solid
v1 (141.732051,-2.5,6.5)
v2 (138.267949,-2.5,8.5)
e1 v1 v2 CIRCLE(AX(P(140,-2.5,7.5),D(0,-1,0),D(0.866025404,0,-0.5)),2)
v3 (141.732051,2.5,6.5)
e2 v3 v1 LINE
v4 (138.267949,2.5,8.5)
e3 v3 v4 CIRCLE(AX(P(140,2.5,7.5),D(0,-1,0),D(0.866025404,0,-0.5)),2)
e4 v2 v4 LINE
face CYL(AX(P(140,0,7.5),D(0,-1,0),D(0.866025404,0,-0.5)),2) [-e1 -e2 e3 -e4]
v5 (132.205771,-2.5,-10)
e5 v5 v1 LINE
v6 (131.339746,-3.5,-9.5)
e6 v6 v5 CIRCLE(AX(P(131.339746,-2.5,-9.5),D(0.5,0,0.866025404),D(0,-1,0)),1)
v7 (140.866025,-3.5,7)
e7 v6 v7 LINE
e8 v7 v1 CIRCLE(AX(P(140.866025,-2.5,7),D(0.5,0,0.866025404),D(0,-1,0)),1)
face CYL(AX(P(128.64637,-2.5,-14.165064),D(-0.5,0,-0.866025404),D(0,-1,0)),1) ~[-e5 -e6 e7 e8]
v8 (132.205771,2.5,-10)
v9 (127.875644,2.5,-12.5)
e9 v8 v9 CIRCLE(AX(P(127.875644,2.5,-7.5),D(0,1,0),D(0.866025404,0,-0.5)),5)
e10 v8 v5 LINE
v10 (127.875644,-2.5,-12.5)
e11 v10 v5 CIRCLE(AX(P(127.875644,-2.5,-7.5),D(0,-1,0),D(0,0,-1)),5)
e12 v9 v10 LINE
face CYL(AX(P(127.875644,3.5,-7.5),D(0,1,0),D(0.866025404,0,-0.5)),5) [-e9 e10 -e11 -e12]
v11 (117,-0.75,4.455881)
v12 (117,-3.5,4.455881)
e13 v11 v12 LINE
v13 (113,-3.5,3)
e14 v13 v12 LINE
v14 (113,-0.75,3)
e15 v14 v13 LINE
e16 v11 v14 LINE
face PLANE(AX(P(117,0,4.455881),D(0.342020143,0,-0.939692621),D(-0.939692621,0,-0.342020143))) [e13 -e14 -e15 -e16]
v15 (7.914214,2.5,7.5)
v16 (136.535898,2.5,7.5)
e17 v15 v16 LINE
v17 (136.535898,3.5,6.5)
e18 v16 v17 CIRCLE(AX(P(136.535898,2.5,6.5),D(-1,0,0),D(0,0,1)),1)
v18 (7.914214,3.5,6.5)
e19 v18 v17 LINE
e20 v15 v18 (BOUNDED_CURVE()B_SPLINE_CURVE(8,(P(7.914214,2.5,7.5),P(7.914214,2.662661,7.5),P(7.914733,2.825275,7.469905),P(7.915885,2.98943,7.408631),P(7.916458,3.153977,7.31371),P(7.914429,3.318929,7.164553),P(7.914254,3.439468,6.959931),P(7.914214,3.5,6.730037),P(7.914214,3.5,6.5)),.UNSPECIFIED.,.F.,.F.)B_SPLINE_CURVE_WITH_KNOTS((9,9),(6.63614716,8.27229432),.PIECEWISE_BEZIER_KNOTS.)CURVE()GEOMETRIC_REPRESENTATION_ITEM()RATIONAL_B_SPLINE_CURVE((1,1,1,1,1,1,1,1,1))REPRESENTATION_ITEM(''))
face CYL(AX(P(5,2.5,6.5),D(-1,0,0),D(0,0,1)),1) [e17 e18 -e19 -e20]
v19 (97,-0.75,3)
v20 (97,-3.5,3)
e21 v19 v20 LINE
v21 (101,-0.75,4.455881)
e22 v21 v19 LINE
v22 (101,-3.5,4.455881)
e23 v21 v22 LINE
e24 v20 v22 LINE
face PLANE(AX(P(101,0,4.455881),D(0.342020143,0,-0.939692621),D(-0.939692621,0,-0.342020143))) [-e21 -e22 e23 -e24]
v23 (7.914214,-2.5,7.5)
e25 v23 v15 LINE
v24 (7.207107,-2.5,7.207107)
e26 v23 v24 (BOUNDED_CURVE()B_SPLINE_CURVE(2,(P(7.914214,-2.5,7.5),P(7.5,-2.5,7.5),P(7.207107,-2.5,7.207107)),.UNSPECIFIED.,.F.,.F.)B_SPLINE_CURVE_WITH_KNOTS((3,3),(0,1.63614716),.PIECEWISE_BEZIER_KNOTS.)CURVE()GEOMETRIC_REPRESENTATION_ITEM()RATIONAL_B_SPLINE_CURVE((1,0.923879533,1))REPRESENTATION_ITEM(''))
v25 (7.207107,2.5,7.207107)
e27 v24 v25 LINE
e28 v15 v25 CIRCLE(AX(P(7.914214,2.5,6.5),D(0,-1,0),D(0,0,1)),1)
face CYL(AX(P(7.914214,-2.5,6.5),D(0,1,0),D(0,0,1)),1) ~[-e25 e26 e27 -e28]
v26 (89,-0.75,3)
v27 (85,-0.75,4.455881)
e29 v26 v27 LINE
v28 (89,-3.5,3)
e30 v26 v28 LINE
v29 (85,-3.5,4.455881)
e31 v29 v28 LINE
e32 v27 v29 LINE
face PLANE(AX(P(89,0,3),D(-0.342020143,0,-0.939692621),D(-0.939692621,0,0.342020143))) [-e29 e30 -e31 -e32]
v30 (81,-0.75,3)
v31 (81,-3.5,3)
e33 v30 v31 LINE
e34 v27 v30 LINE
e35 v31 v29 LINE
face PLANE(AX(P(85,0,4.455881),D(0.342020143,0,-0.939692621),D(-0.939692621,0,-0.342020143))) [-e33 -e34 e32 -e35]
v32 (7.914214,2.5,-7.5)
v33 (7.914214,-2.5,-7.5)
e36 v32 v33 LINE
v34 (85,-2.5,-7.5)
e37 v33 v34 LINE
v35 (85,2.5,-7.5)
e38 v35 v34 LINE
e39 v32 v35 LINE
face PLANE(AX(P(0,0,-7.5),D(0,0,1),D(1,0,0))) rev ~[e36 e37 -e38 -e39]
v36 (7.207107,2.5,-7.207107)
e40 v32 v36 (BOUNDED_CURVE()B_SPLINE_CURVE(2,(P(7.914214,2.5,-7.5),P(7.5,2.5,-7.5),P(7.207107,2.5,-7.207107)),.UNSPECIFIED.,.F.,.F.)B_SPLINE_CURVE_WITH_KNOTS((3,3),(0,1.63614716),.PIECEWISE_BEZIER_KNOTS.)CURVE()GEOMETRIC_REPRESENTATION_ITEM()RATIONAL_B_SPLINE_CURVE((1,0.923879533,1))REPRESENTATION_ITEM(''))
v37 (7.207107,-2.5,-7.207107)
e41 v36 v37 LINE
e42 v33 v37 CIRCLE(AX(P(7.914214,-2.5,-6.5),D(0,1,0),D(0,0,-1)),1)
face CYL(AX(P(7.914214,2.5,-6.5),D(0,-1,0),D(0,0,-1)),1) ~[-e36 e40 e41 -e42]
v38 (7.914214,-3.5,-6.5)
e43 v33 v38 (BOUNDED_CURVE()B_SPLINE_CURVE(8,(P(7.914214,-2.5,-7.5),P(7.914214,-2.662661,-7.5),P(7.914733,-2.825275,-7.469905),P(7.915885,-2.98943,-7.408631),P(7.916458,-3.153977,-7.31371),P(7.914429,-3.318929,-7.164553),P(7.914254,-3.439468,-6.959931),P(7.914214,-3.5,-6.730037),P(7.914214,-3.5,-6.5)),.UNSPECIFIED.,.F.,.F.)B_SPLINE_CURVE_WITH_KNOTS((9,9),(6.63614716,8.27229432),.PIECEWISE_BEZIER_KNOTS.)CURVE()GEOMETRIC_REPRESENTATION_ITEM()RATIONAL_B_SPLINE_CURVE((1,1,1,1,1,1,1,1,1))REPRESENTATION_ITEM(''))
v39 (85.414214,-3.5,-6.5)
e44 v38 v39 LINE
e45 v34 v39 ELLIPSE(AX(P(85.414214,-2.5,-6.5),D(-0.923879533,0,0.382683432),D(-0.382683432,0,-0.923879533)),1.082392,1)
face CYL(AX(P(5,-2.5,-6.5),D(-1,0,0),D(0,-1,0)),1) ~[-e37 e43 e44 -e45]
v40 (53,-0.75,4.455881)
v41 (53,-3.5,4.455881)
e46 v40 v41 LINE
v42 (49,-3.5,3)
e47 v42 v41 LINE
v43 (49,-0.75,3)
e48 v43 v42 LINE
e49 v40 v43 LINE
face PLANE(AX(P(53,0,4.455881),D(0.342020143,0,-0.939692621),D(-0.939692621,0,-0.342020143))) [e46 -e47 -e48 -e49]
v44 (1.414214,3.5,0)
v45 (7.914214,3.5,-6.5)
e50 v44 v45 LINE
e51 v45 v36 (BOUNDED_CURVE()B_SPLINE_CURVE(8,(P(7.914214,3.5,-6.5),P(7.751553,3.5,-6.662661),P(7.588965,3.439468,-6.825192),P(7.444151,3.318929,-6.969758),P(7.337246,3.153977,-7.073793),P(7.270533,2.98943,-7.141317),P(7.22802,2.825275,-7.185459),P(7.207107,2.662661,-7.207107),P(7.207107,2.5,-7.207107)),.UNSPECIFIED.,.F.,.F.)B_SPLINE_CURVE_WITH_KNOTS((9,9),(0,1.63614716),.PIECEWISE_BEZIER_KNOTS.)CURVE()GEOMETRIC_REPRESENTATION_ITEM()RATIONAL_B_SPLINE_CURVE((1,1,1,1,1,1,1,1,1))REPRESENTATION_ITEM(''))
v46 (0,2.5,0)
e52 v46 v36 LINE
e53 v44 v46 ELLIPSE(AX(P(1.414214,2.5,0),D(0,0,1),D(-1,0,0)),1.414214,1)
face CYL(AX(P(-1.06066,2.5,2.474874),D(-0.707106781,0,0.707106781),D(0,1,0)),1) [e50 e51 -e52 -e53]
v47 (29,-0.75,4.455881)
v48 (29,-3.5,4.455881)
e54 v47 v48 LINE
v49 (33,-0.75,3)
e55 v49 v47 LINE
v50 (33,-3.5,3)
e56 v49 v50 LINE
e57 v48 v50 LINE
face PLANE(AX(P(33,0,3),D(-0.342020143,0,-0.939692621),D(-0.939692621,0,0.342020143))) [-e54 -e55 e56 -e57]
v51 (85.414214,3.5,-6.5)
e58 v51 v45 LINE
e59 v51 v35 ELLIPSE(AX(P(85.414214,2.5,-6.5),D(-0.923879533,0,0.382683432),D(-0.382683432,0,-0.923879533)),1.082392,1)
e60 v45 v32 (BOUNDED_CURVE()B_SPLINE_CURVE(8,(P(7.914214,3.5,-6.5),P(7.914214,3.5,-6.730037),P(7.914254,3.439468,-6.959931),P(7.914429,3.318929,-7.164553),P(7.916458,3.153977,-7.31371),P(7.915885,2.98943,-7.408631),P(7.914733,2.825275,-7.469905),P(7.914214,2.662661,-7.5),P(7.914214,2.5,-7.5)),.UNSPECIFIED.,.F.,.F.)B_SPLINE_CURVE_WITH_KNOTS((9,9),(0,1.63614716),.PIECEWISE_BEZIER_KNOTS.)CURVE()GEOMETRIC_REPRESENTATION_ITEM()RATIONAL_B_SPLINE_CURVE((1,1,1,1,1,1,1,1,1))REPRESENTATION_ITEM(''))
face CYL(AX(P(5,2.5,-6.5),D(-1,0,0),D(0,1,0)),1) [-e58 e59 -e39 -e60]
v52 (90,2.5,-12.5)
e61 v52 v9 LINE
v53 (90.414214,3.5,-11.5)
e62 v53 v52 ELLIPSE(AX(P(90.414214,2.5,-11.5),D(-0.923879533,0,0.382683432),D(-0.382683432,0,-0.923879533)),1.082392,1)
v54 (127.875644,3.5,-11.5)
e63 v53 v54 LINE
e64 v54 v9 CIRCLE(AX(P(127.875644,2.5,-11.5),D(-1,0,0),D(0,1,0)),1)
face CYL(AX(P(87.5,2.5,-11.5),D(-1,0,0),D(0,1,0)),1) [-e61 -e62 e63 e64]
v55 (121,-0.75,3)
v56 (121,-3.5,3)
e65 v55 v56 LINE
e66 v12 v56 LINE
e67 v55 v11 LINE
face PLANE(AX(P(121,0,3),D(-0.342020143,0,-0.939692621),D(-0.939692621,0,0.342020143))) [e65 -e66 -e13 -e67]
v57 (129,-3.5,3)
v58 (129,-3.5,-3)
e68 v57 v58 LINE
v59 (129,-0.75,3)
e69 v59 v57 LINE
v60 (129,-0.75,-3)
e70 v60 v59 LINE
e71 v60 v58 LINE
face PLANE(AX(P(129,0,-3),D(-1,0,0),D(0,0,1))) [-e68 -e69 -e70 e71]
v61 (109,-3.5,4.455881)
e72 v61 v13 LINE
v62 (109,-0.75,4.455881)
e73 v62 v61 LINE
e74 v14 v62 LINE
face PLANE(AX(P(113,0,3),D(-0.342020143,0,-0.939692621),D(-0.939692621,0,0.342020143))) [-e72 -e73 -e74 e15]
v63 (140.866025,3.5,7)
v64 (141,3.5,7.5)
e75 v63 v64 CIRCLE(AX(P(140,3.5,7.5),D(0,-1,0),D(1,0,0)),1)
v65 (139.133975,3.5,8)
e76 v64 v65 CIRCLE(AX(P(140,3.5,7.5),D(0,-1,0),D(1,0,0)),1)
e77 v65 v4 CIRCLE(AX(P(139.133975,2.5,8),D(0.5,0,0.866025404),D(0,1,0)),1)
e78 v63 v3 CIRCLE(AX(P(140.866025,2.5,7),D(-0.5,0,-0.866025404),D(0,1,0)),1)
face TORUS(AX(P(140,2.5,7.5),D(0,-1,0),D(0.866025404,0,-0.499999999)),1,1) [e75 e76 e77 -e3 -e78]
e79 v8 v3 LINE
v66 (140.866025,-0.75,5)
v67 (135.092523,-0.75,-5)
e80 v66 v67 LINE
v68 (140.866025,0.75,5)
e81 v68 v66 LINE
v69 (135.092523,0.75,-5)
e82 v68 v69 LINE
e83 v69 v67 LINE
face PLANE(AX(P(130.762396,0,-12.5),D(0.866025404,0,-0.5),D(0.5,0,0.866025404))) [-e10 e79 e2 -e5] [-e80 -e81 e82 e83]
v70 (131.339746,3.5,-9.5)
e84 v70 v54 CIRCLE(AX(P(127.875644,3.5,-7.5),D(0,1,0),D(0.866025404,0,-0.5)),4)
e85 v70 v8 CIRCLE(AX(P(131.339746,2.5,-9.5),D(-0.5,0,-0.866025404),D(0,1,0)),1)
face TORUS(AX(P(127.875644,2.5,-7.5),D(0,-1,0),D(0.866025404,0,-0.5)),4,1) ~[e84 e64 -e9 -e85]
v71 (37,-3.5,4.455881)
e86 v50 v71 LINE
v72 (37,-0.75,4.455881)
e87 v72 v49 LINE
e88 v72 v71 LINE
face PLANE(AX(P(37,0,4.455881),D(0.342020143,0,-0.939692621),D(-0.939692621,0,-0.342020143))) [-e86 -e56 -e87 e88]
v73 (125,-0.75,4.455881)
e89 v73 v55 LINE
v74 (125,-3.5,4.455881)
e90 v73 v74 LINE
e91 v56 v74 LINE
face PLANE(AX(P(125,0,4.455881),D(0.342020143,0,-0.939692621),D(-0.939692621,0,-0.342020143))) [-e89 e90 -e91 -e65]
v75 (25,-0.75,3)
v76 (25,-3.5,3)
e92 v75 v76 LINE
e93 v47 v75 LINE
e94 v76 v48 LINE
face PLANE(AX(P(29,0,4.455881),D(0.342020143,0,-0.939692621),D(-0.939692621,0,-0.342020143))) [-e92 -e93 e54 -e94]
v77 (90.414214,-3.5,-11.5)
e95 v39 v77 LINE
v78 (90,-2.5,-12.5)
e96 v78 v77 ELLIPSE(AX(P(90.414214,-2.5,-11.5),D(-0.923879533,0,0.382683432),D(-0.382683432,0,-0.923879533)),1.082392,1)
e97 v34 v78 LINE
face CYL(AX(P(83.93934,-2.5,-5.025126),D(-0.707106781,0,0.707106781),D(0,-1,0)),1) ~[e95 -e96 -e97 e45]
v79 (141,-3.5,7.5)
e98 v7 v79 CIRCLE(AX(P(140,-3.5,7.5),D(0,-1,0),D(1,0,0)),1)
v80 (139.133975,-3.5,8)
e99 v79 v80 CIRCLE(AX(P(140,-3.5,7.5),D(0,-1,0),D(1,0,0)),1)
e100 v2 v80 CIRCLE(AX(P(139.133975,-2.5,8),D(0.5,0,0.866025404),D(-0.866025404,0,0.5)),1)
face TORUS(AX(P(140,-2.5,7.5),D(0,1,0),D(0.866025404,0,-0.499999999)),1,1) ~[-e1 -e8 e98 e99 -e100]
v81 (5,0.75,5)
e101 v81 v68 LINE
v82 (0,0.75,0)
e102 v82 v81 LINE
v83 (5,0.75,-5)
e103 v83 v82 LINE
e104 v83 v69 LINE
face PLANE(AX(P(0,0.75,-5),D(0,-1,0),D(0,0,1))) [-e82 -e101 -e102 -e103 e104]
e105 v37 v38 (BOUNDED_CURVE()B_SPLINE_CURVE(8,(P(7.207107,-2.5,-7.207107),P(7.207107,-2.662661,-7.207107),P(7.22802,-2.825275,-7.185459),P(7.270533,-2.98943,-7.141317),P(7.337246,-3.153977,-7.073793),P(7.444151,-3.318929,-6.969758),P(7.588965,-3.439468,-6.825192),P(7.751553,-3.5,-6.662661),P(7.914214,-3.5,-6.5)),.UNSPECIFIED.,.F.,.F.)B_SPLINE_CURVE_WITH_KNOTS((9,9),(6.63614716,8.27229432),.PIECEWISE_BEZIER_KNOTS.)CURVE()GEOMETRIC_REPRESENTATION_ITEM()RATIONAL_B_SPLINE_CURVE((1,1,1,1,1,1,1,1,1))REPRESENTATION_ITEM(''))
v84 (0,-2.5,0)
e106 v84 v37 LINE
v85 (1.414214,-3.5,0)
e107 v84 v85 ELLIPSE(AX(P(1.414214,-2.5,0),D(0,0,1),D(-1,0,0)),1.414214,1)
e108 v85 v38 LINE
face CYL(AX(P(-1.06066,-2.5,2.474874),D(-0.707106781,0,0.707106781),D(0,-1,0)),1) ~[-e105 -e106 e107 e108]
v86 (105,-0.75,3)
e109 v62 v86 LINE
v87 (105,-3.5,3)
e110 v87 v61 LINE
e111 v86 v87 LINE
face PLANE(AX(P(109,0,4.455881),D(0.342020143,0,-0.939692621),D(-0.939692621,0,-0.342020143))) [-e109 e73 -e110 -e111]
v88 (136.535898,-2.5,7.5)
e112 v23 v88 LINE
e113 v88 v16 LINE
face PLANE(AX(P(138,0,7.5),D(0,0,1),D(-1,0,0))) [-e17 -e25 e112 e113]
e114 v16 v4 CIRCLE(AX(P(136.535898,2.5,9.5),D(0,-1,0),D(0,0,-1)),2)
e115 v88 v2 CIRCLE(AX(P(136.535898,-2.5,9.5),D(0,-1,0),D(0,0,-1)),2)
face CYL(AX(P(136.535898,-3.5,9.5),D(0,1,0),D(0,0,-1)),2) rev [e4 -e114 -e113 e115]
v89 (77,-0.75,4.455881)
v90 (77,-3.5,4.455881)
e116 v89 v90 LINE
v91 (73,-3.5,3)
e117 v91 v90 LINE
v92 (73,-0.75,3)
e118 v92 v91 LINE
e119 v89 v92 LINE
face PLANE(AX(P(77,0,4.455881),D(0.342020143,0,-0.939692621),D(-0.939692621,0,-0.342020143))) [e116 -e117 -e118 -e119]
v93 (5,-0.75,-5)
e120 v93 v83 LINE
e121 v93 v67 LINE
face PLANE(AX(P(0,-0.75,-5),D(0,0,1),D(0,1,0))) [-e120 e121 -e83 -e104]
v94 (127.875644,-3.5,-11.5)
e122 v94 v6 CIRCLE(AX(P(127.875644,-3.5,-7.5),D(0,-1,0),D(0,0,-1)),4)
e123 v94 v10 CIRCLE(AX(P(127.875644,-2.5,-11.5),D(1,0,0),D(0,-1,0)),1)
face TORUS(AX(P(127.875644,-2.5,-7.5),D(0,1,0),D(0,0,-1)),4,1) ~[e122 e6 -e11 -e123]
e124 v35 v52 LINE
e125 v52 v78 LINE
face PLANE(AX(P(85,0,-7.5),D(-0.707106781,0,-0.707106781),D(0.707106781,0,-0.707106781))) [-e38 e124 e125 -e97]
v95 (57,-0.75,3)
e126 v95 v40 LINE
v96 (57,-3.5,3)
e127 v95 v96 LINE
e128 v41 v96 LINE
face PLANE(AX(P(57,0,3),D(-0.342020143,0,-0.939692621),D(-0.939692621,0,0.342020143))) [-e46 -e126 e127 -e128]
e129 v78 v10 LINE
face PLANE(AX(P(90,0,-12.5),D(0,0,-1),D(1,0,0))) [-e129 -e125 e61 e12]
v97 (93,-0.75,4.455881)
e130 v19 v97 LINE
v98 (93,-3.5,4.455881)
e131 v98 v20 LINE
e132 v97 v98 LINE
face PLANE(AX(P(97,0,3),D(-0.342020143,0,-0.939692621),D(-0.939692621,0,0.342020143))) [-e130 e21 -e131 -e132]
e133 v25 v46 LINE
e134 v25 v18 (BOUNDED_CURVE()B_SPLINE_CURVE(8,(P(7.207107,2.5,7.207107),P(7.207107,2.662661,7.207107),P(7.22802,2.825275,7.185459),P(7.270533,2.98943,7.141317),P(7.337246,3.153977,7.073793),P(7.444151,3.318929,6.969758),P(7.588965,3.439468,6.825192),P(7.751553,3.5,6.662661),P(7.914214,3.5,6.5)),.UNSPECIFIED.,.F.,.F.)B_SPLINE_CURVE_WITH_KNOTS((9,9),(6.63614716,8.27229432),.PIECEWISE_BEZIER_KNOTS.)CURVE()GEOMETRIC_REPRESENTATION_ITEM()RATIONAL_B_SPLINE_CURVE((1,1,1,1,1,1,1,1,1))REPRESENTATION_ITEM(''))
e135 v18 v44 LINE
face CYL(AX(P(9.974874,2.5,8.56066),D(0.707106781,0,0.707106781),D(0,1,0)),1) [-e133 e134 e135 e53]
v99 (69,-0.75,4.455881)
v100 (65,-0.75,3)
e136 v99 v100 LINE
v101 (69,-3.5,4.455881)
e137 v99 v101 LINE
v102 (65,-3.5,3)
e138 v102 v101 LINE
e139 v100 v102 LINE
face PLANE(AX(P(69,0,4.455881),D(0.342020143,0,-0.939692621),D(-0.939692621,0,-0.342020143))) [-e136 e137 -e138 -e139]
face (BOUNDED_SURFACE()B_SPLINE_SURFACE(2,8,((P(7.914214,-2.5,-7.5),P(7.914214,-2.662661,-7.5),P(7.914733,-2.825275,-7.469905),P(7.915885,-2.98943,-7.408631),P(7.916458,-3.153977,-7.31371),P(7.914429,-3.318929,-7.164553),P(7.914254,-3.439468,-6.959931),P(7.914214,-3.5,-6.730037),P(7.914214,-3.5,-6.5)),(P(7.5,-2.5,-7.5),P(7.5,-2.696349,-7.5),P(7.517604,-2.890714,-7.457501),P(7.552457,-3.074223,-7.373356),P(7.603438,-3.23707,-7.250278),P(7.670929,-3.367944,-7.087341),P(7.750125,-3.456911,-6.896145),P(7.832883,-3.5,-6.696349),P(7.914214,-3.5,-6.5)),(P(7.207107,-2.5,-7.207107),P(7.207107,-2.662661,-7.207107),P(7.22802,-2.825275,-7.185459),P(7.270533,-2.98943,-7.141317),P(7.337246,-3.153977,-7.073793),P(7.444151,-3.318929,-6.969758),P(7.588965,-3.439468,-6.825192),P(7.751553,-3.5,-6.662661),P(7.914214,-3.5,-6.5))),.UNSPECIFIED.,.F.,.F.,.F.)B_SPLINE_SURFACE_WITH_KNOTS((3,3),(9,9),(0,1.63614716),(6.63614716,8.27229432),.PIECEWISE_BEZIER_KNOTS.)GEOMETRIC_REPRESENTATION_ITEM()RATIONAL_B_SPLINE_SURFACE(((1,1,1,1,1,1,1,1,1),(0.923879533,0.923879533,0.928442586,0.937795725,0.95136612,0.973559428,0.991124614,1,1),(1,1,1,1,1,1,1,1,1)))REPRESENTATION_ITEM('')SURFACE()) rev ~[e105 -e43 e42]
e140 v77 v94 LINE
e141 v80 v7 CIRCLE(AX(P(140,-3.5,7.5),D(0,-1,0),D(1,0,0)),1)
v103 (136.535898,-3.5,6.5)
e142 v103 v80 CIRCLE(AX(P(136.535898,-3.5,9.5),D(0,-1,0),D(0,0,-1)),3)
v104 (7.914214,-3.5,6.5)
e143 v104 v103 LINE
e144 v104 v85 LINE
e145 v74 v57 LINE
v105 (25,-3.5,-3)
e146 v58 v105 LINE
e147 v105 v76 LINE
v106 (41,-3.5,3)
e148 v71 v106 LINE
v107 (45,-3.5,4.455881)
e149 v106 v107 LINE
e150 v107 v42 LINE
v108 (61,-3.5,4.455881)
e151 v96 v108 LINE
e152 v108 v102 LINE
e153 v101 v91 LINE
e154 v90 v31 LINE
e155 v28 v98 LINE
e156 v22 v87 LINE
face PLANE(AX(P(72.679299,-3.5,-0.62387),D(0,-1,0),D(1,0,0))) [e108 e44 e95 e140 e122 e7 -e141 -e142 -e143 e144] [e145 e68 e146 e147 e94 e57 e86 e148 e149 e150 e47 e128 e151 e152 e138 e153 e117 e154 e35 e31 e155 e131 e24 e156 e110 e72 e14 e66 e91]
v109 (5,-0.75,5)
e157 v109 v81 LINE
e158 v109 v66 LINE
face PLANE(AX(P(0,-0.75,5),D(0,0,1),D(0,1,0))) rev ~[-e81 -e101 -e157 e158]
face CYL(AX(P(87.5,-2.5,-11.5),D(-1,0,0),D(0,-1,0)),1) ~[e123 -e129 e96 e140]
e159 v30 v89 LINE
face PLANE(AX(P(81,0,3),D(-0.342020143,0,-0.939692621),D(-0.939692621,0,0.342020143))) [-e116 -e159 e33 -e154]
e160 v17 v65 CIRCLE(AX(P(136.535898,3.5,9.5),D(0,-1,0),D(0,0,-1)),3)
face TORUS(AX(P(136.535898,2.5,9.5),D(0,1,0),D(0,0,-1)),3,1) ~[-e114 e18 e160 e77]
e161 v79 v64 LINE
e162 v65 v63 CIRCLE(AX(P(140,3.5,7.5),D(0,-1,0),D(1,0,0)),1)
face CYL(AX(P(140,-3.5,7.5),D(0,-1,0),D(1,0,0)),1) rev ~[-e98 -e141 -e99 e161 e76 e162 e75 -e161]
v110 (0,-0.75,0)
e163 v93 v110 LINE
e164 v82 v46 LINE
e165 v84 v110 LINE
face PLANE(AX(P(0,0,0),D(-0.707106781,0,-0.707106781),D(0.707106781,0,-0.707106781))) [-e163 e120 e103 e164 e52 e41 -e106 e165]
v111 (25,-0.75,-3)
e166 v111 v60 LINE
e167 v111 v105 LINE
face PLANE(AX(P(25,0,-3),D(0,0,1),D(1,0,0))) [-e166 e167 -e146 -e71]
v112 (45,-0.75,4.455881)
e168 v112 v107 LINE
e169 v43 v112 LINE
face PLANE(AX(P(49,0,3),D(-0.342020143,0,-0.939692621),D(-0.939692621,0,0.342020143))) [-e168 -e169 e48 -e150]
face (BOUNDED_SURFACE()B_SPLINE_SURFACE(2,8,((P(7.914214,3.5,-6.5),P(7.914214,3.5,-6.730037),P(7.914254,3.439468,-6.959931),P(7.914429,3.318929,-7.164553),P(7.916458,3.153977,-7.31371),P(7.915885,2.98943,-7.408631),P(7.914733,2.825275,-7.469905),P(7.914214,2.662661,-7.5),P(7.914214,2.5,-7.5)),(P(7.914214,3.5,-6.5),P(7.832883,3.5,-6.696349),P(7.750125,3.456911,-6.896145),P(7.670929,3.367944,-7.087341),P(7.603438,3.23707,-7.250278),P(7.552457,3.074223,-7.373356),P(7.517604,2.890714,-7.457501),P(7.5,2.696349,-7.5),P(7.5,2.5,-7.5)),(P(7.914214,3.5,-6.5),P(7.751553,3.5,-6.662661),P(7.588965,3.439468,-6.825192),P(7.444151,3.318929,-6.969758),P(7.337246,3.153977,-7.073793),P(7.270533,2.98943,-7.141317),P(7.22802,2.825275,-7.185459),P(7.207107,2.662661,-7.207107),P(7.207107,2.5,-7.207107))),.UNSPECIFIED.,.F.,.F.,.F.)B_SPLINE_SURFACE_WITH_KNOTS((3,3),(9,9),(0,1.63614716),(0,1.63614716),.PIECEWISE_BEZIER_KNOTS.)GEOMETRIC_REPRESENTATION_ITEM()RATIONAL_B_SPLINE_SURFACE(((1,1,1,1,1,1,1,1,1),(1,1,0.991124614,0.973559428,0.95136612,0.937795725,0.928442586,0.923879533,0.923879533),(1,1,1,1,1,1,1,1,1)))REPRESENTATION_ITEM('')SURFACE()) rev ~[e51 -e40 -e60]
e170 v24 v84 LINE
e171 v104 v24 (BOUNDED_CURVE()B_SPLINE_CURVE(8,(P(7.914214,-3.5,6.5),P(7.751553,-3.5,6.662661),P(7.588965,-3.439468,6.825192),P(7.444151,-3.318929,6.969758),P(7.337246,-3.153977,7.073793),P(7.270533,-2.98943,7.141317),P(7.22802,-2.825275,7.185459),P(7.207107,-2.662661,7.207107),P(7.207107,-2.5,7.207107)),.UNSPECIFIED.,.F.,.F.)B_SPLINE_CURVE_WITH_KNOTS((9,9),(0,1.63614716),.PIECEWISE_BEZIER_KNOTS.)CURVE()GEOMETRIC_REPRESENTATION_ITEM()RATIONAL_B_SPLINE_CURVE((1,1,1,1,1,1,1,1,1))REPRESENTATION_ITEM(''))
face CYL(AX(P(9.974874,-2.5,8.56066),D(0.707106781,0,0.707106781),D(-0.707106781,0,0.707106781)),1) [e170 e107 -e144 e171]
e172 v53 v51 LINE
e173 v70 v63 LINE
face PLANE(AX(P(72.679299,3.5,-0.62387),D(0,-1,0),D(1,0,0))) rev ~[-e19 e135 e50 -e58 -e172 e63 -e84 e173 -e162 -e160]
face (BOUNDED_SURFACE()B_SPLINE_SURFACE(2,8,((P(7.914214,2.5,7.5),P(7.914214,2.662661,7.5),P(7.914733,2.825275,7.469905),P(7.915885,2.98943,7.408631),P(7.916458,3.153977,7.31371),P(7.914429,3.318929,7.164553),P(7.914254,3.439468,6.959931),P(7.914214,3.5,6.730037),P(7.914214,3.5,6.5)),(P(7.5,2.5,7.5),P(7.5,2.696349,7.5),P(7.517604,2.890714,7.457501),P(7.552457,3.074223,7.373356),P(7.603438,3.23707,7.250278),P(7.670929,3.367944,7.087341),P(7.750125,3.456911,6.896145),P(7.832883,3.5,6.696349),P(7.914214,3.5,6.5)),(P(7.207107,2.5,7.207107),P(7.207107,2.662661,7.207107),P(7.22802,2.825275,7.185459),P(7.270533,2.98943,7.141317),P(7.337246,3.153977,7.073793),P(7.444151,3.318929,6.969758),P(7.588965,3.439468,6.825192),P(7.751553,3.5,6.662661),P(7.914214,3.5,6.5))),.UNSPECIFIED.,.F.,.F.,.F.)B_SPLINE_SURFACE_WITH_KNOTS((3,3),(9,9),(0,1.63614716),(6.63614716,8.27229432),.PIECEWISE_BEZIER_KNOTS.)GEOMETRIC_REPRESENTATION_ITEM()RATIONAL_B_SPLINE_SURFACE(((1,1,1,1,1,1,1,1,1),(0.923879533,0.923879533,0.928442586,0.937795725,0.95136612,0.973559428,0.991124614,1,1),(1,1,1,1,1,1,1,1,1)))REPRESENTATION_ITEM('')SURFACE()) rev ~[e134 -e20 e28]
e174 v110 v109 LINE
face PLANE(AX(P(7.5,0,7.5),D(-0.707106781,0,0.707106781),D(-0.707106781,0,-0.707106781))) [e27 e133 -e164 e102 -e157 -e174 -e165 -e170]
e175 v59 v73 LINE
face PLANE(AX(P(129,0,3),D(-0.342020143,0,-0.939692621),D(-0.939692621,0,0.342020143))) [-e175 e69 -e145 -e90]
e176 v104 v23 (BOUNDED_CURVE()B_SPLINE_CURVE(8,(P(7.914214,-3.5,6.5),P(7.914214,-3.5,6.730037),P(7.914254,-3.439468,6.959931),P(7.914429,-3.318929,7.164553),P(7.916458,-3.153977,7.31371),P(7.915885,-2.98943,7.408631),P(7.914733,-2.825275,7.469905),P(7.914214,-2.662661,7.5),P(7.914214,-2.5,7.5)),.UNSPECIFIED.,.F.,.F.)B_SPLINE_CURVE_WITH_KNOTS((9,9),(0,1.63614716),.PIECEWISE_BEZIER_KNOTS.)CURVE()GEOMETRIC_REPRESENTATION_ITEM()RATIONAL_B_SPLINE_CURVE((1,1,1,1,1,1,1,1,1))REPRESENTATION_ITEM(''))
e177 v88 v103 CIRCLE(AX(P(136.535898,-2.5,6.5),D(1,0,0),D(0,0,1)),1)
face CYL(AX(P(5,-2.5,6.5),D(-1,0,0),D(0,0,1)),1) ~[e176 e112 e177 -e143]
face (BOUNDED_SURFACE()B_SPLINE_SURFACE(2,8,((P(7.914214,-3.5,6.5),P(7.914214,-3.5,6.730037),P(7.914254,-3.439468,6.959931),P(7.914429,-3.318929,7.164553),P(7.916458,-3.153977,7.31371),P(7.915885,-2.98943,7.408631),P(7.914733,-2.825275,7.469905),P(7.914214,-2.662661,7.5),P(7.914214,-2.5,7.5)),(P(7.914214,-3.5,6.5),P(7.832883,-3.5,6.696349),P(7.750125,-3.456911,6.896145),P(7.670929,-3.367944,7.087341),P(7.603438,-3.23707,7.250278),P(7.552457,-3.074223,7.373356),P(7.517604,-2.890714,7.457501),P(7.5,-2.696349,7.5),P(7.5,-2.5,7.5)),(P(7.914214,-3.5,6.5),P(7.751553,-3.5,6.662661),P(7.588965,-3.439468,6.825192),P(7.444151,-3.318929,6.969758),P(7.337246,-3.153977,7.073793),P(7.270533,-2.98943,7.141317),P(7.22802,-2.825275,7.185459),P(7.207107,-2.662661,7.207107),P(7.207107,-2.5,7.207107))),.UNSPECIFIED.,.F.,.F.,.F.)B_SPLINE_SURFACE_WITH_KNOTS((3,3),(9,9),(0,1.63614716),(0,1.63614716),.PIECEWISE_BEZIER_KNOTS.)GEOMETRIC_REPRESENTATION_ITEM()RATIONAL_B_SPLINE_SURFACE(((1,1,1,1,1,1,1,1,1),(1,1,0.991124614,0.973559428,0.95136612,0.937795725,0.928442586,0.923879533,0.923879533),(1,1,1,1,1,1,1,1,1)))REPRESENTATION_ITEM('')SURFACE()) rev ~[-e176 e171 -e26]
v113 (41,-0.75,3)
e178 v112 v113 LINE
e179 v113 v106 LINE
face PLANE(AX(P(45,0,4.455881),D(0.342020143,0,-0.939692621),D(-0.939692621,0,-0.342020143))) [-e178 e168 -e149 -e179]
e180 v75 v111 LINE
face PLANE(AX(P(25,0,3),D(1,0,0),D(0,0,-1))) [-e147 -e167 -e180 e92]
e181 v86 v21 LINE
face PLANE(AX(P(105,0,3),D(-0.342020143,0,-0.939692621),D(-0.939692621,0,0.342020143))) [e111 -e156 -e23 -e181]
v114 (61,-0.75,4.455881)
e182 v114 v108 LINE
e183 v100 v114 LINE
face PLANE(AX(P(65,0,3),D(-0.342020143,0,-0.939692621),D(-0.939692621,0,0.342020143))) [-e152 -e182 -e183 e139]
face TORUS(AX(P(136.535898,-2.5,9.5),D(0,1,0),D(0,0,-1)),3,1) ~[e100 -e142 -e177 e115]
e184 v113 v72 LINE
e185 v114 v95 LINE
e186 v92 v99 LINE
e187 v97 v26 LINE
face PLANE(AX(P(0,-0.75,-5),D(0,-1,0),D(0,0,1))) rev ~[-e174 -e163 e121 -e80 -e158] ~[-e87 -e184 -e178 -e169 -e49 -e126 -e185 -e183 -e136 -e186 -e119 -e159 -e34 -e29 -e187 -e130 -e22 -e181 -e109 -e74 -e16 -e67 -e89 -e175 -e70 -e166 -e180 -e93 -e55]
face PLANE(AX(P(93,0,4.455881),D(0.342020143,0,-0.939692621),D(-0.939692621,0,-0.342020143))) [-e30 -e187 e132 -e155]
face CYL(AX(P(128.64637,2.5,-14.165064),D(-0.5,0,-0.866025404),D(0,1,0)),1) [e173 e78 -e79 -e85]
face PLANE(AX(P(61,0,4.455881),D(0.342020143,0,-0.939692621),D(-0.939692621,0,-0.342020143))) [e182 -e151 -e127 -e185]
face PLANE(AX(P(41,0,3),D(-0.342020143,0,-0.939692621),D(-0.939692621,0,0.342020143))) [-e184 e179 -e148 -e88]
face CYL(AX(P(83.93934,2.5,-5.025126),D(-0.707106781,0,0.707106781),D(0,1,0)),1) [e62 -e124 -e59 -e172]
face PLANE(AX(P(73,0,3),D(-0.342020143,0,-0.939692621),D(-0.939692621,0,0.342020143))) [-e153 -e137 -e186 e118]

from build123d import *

# Parameters (mm, degrees)
F1_DEPTH     = 3.5
F3_DEPTH     = 3.501
F4_W         = 1.5
F4_H         = 10
F5_DEPTH     = 142.001
F6_R         = 1
F7_DEPTH     = 7.001
F8_R         = 2
F9_T1_DEPTH  = 131.5358983849
F9_T3_DEPTH  = 45.762395693
F9_T5_DEPTH  = 15.6066017178
F9_T7_DEPTH  = 15.6066017178
F9_T9_DEPTH  = 24.4393102292
F9_T14_DEPTH = 12.0710678119
F9_T19_DEPTH = 12.0710678119
F9_T24_DEPTH = 82.5
F9_T29_DEPTH = 82.5
F9_T32_ANGLE = 60
F9_T34_ANGLE = 180
F9_T36_ANGLE = 60
F9_T38_ANGLE = 180
F9_T43_DEPTH = 82.5
F9_T47_DEPTH = 12.0710678119
F9_T54_DEPTH = 82.5
F9_T58_DEPTH = 12.0710678119
F10_R        = 1
F11_T1_DEPTH = 6.9999999999
F11_T4_ANGLE = 60
F11_T6_ANGLE = 60


# Not quite as in the source:
# - a fillet or chamfer that OpenCascade refuses, or shapes differently, is made with other operations: its cross-section is extruded or revolved along the edge and cut away or added


with BuildPart() as f1:
    # F0 (on Front) → F1 (new body, symmetric)
    with BuildSketch(Plane.XZ):
        with BuildLine():
            Line((0, 0), (7.5, -7.5))
            Line((7.5, -7.5), (85, -7.5))
            Line((85, -7.5), (90, -12.5))
            Line((90, -12.5), (130.762395693, -12.5))
            Line((130.762395693, -12.5), (141.7320508076, 6.5))
            ThreePointArc((141.7320508076, 6.5), (140.5176380902, 9.4318516526), (138, 7.5))
            Line((138, 7.5), (7.5, 7.5))
            Line((7.5, 7.5), (0, 0))
        make_face()
    extrude(amount=F1_DEPTH, both=True)

    # F2 (on Front) → F3 (cut, through all)
    with BuildSketch(Plane.XZ):
        Polygon((29, 4.4558809371), (25, 3), (25, -3), (33, -3), (33, 3), align=None)
        Polygon((37, 4.4558809371), (33, 3), (33, -3), (41, -3), (49, -3), (57, -3), (65, -3), (73, -3), (81, -3), (89, -3), (97, -3), (105, -3), (113, -3), (121, -3), (129, -3), (129, 3), (125, 4.4558809371), (121, 3), (117, 4.4558809371), (113, 3), (109, 4.4558809371), (105, 3), (101, 4.4558809371), (97, 3), (93, 4.4558809371), (89, 3), (85, 4.4558809371), (81, 3), (77, 4.4558809371), (73, 3), (69, 4.4558809371), (65, 3), (61, 4.4558809371), (57, 3), (53, 4.4558809371), (49, 3), (45, 4.4558809371), (41, 3), align=None)
    extrude(amount=F3_DEPTH, mode=Mode.SUBTRACT)

    # F4 (on Right) → F5 (cut, through all)
    with BuildSketch(Plane.YZ):
        Rectangle(F4_W, F4_H)
    extrude(amount=F5_DEPTH, mode=Mode.SUBTRACT)

    # F6 (on face) → F7 (cut, through all)
    with BuildSketch(Plane.XZ.offset(3.5)):
        with Locations((140, 7.5)):
            Circle(F6_R)
    extrude(amount=-F7_DEPTH, mode=Mode.SUBTRACT)

    # F8
    f8_edges = [f1.edges().sort_by_distance(p)[0] for p in [
        (138, 0, 7.5),
    ]]
    fillet(f8_edges, radius=F8_R)

    # F9: fillet of radius 1 on 12 edges, made by hand

    # F9_s2 → F9_t1 (cut)
    with BuildSketch(Plane.YZ.offset(5)):
        with BuildLine():
            ThreePointArc((-2.5, 7.5), (-3.2071067812, 7.2071067812), (-3.5, 6.5))
            Line((-3.5, 6.5), (-3.5, 7.5))
            Line((-3.5, 7.5), (-2.5, 7.5))
        make_face()
        with BuildLine():
            ThreePointArc((2.5, 7.5), (3.2071067812, 7.2071067812), (3.5, 6.5))
            Line((3.5, 6.5), (3.5, 7.5))
            Line((3.5, 7.5), (2.5, 7.5))
        make_face()
    extrude(amount=F9_T1_DEPTH, mode=Mode.SUBTRACT)

    # F9_s4 → F9_t3 (cut)
    with BuildSketch(Plane.YZ.offset(87.5)):
        with BuildLine():
            ThreePointArc((-3.5, -11.5), (-3.2071067812, -12.2071067812), (-2.5, -12.5))
            Line((-2.5, -12.5), (-3.5, -12.5))
            Line((-3.5, -12.5), (-3.5, -11.5))
        make_face()
        with BuildLine():
            ThreePointArc((3.5, -11.5), (3.2071067812, -12.2071067812), (2.5, -12.5))
            Line((2.5, -12.5), (3.5, -12.5))
            Line((3.5, -12.5), (3.5, -11.5))
        make_face()
    extrude(amount=F9_T3_DEPTH, mode=Mode.SUBTRACT)

    # F9_s6 → F9_t5 (cut)
    with BuildSketch(Plane(origin=(-1.767766953, 0, 1.767766953), x_dir=(0, 1, 0), z_dir=(0.7071067812, 0, -0.7071067812))):
        with BuildLine():
            ThreePointArc((-3.5, 1), (-3.2071067812, 0.2928932188), (-2.5, 0))
            Line((-2.5, 0), (-3.5, 0))
            Line((-3.5, 0), (-3.5, 1))
        make_face()
        with BuildLine():
            ThreePointArc((3.5, 1), (3.2071067812, 0.2928932188), (2.5, 0))
            Line((2.5, 0), (3.5, 0))
            Line((3.5, 0), (3.5, 1))
        make_face()
    extrude(amount=F9_T5_DEPTH, mode=Mode.SUBTRACT)

    # F9_s8 → F9_t7 (cut)
    with BuildSketch(Plane(origin=(9.267766953, 0, 9.267766953), x_dir=(0, 1, 0), z_dir=(-0.7071067812, 0, -0.7071067812))):
        with BuildLine():
            ThreePointArc((-2.5, 0), (-3.2071067812, 0.2928932188), (-3.5, 1))
            Line((-3.5, 1), (-3.5, 0))
            Line((-3.5, 0), (-2.5, 0))
        make_face()
        with BuildLine():
            ThreePointArc((3.5, 1), (3.2071067812, 0.2928932188), (2.5, 0))
            Line((2.5, 0), (3.5, 0))
            Line((3.5, 0), (3.5, 1))
        make_face()
    extrude(amount=F9_T7_DEPTH, mode=Mode.SUBTRACT)

    # F9_s10 → F9_t9 (cut)
    with BuildSketch(Plane(origin=(26.0279401496, 0, 45.0817147554), x_dir=(0, 1, 0), z_dir=(0.5, 0, 0.8660254038))):
        with BuildLine():
            ThreePointArc((3.5, -118.4935565298), (3.2071067812, -119.200663311), (2.5, -119.4935565298))
            Line((2.5, -119.4935565298), (3.5, -119.4935565298))
            Line((3.5, -119.4935565298), (3.5, -118.4935565298))
        make_face()
        with BuildLine():
            ThreePointArc((-3.5, -118.4935565298), (-3.2071067812, -119.200663311), (-2.5, -119.4935565298))
            Line((-2.5, -119.4935565298), (-3.5, -119.4935565298))
            Line((-3.5, -119.4935565298), (-3.5, -118.4935565298))
        make_face()
    extrude(amount=F9_T9_DEPTH, mode=Mode.SUBTRACT)


with BuildPart() as f9_tool12:
    # F9_s13 → F9_t14 (new body)
    with BuildSketch(Plane(origin=(44.482233047, 0, -44.482233047), x_dir=(0, 1, 0), z_dir=(0.7071067812, 0, -0.7071067812))):
        with BuildLine():
            ThreePointArc((-3.5, 55.800775542), (-3.2071067812, 55.0936687608), (-2.5, 54.800775542))
            Line((-2.5, 54.800775542), (-3.5, 54.800775542))
            Line((-3.5, 54.800775542), (-3.5, 55.800775542))
        make_face()
    extrude(amount=F9_T14_DEPTH)

    split(bisect_by=Plane.XY.offset(-7.5), keep=Keep.BOTTOM)


with BuildPart() as f1_1:
    add(f1.part)

    # F9_t11: cut F9_tool12
    add(f9_tool12.part, mode=Mode.SUBTRACT)


with BuildPart() as f9_tool17:
    # F9_s18 → F9_t19 (new body)
    with BuildSketch(Plane(origin=(44.482233047, 0, -44.482233047), x_dir=(0, 1, 0), z_dir=(0.7071067812, 0, -0.7071067812))):
        with BuildLine():
            ThreePointArc((3.5, 55.800775542), (3.2071067812, 55.0936687608), (2.5, 54.800775542))
            Line((2.5, 54.800775542), (3.5, 54.800775542))
            Line((3.5, 54.800775542), (3.5, 55.800775542))
        make_face()
    extrude(amount=F9_T19_DEPTH)

    split(bisect_by=Plane.XY.offset(-7.5), keep=Keep.BOTTOM)


with BuildPart() as f1_2:
    add(f1_1.part)

    # F9_t16: cut F9_tool17
    add(f9_tool17.part, mode=Mode.SUBTRACT)


with BuildPart() as f9_tool22:
    # F9_s23 → F9_t24 (new body)
    with BuildSketch(Plane.YZ.offset(5)):
        with BuildLine():
            ThreePointArc((-3.5, -6.5), (-3.2071067812, -7.2071067812), (-2.5, -7.5))
            Line((-2.5, -7.5), (-3.5, -7.5))
            Line((-3.5, -7.5), (-3.5, -6.5))
        make_face()
    extrude(amount=F9_T24_DEPTH)

    split(bisect_by=Plane(origin=(38.75, 0, 38.75), x_dir=(0, 1, 0), z_dir=(-0.7071067812, 0, -0.7071067812)), keep=Keep.TOP)


with BuildPart() as f1_3:
    add(f1_2.part)

    # F9_t21: cut F9_tool22
    add(f9_tool22.part, mode=Mode.SUBTRACT)


with BuildPart() as f9_tool27:
    # F9_s28 → F9_t29 (new body)
    with BuildSketch(Plane.YZ.offset(5)):
        with BuildLine():
            ThreePointArc((3.5, -6.5), (3.2071067812, -7.2071067812), (2.5, -7.5))
            Line((2.5, -7.5), (3.5, -7.5))
            Line((3.5, -7.5), (3.5, -6.5))
        make_face()
    extrude(amount=F9_T29_DEPTH)

    split(bisect_by=Plane(origin=(38.75, 0, 38.75), x_dir=(0, 1, 0), z_dir=(-0.7071067812, 0, -0.7071067812)), keep=Keep.TOP)


with BuildPart() as f1_4:
    add(f1_3.part)

    # F9_t26: cut F9_tool27
    add(f9_tool27.part, mode=Mode.SUBTRACT)

    # F9_s31 → F9_t32 (revolve, cut)
    with BuildSketch(Plane.YZ.offset(136.5358983849)):
        with BuildLine():
            ThreePointArc((3.5, 6.5), (3.2071067812, 7.2071067812), (2.5, 7.5))
            Line((2.5, 7.5), (3.5, 7.5))
            Line((3.5, 7.5), (3.5, 6.5))
        make_face()
    revolve(axis=Axis((136.5358983849, 3.5, 9.5), (0, -1, 0)), revolution_arc=F9_T32_ANGLE, mode=Mode.SUBTRACT)

    # F9_s33 → F9_t34 (revolve, cut)
    with BuildSketch(Plane(origin=(38.2475952642, 0, 66.2467782649), x_dir=(0, 1, 0), z_dir=(-0.5, 0, -0.8660254038))):
        with BuildLine():
            ThreePointArc((3.5, 118.4935565298), (3.2071067812, 119.200663311), (2.5, 119.4935565298))
            Line((2.5, 119.4935565298), (3.5, 119.4935565298))
            Line((3.5, 119.4935565298), (3.5, 118.4935565298))
        make_face()
    revolve(axis=Axis((140, 3.5, 7.5), (0, -1, 0)), revolution_arc=F9_T34_ANGLE, mode=Mode.SUBTRACT)

    # F9_s35 → F9_t36 (revolve, cut)
    with BuildSketch(Plane.YZ.offset(136.5358983849)):
        with BuildLine():
            ThreePointArc((-2.5, 7.5), (-3.2071067812, 7.2071067812), (-3.5, 6.5))
            Line((-3.5, 6.5), (-3.5, 7.5))
            Line((-3.5, 7.5), (-2.5, 7.5))
        make_face()
    revolve(axis=Axis((136.5358983849, -3.5, 9.5), (0, -1, 0)), revolution_arc=F9_T36_ANGLE, mode=Mode.SUBTRACT)

    # F9_s37 → F9_t38 (revolve, cut)
    with BuildSketch(Plane(origin=(38.2475952642, 0, 66.2467782649), x_dir=(0, 1, 0), z_dir=(-0.5, 0, -0.8660254038))):
        with BuildLine():
            ThreePointArc((-3.5, 118.4935565298), (-3.2071067812, 119.200663311), (-2.5, 119.4935565298))
            Line((-2.5, 119.4935565298), (-3.5, 119.4935565298))
            Line((-3.5, 119.4935565298), (-3.5, 118.4935565298))
        make_face()
    revolve(axis=Axis((140, -3.5, 7.5), (0, -1, 0)), revolution_arc=F9_T38_ANGLE, mode=Mode.SUBTRACT)


with BuildPart() as f9_tool41:
    # F9_s42 → F9_t43 (new body)
    with BuildSketch(Plane.YZ.offset(5)):
        with BuildLine():
            ThreePointArc((-3.5, -6.5), (-3.2071067812, -7.2071067812), (-2.5, -7.5))
            Line((-2.5, -7.5), (-3.5, -7.5))
            Line((-3.5, -7.5), (-3.5, -6.5))
        make_face()
    extrude(amount=F9_T43_DEPTH)

    split(bisect_by=Plane(origin=(38.75, 0, 38.75), x_dir=(0, 1, 0), z_dir=(0.7071067812, 0, 0.7071067812)), keep=Keep.TOP)


with BuildPart() as f9_tool45:
    # F9_s46 → F9_t47 (new body)
    with BuildSketch(Plane(origin=(44.482233047, 0, -44.482233047), x_dir=(0, 1, 0), z_dir=(0.7071067812, 0, -0.7071067812))):
        with BuildLine():
            ThreePointArc((-3.5, 55.800775542), (-3.2071067812, 55.0936687608), (-2.5, 54.800775542))
            Line((-2.5, 54.800775542), (-3.5, 54.800775542))
            Line((-3.5, 54.800775542), (-3.5, 55.800775542))
        make_face()
    extrude(amount=F9_T47_DEPTH)

    split(bisect_by=Plane.XY.offset(-7.5), keep=Keep.TOP)


with BuildPart() as f9_tool41_1:
    add(f9_tool41.part)

    # F9_t49: intersect F9_tool45
    add(f9_tool45.part, mode=Mode.INTERSECT)


with BuildPart() as f1_5:
    add(f1_4.part)

    # F9_t39: cut F9_tool41
    add(f9_tool41_1.part, mode=Mode.SUBTRACT)


with BuildPart() as f9_tool52:
    # F9_s53 → F9_t54 (new body)
    with BuildSketch(Plane.YZ.offset(5)):
        with BuildLine():
            ThreePointArc((3.5, -6.5), (3.2071067812, -7.2071067812), (2.5, -7.5))
            Line((2.5, -7.5), (3.5, -7.5))
            Line((3.5, -7.5), (3.5, -6.5))
        make_face()
    extrude(amount=F9_T54_DEPTH)

    split(bisect_by=Plane(origin=(38.75, 0, 38.75), x_dir=(0, 1, 0), z_dir=(0.7071067812, 0, 0.7071067812)), keep=Keep.TOP)


with BuildPart() as f9_tool56:
    # F9_s57 → F9_t58 (new body)
    with BuildSketch(Plane(origin=(44.482233047, 0, -44.482233047), x_dir=(0, 1, 0), z_dir=(0.7071067812, 0, -0.7071067812))):
        with BuildLine():
            ThreePointArc((3.5, 55.800775542), (3.2071067812, 55.0936687608), (2.5, 54.800775542))
            Line((2.5, 54.800775542), (3.5, 54.800775542))
            Line((3.5, 54.800775542), (3.5, 55.800775542))
        make_face()
    extrude(amount=F9_T58_DEPTH)

    split(bisect_by=Plane.XY.offset(-7.5), keep=Keep.TOP)


with BuildPart() as f9_tool52_1:
    add(f9_tool52.part)

    # F9_t60: intersect F9_tool56
    add(f9_tool56.part, mode=Mode.INTERSECT)


with BuildPart() as f1_6:
    add(f1_5.part)

    # F9_t50: cut F9_tool52
    add(f9_tool52_1.part, mode=Mode.SUBTRACT)

    # F10
    f10_edges = [f1_6.edges().sort_by_distance(p)[0] for p in [
        (7.5, 0, 7.5),
        (7.5, 0, -7.5),
    ]]
    fillet(f10_edges, radius=F10_R)

    # F11: fillet of radius 5 on 1 edges, made by hand

    # F11_s2 → F11_t1 (cut)
    with BuildSketch(Plane.XZ.offset(-3.5)):
        with BuildLine():
            ThreePointArc((132.2057713659, -10), (130.375644347, -11.8301270189), (127.875644347, -12.5))
            Line((127.875644347, -12.5), (130.762395693, -12.5))
            Line((130.762395693, -12.5), (132.2057713659, -10))
        make_face()
    extrude(amount=F11_T1_DEPTH, mode=Mode.SUBTRACT)

    # F11_s3 → F11_t4 (revolve, cut)
    with BuildSketch(Plane(origin=(28.7213158226, 0, 49.7467782649), x_dir=(0, 1, 0), z_dir=(0.5, 0, 0.8660254038))):
        with BuildLine():
            ThreePointArc((3.5, -118.4935565299), (3.2071067812, -119.200663311), (2.5, -119.4935565298))
            Line((2.5, -119.4935565298), (3.5, -119.4935565298))
            Line((3.5, -119.4935565298), (3.5, -118.4935565299))
        make_face()
    revolve(axis=Axis((127.875644347, 3.5, -7.5), (0, 1, 0)), revolution_arc=F11_T4_ANGLE, mode=Mode.SUBTRACT)

    # F11_s5 → F11_t6 (revolve, cut)
    with BuildSketch(Plane.YZ.offset(127.875644347)):
        with BuildLine():
            ThreePointArc((-3.5, -11.5), (-3.2071067812, -12.2071067812), (-2.5, -12.5))
            Line((-2.5, -12.5), (-3.5, -12.5))
            Line((-3.5, -12.5), (-3.5, -11.5))
        make_face()
    revolve(axis=Axis((127.875644347, -3.5, -7.5), (0, -1, 0)), revolution_arc=F11_T6_ANGLE, mode=Mode.SUBTRACT)


solid = f1_6.part
